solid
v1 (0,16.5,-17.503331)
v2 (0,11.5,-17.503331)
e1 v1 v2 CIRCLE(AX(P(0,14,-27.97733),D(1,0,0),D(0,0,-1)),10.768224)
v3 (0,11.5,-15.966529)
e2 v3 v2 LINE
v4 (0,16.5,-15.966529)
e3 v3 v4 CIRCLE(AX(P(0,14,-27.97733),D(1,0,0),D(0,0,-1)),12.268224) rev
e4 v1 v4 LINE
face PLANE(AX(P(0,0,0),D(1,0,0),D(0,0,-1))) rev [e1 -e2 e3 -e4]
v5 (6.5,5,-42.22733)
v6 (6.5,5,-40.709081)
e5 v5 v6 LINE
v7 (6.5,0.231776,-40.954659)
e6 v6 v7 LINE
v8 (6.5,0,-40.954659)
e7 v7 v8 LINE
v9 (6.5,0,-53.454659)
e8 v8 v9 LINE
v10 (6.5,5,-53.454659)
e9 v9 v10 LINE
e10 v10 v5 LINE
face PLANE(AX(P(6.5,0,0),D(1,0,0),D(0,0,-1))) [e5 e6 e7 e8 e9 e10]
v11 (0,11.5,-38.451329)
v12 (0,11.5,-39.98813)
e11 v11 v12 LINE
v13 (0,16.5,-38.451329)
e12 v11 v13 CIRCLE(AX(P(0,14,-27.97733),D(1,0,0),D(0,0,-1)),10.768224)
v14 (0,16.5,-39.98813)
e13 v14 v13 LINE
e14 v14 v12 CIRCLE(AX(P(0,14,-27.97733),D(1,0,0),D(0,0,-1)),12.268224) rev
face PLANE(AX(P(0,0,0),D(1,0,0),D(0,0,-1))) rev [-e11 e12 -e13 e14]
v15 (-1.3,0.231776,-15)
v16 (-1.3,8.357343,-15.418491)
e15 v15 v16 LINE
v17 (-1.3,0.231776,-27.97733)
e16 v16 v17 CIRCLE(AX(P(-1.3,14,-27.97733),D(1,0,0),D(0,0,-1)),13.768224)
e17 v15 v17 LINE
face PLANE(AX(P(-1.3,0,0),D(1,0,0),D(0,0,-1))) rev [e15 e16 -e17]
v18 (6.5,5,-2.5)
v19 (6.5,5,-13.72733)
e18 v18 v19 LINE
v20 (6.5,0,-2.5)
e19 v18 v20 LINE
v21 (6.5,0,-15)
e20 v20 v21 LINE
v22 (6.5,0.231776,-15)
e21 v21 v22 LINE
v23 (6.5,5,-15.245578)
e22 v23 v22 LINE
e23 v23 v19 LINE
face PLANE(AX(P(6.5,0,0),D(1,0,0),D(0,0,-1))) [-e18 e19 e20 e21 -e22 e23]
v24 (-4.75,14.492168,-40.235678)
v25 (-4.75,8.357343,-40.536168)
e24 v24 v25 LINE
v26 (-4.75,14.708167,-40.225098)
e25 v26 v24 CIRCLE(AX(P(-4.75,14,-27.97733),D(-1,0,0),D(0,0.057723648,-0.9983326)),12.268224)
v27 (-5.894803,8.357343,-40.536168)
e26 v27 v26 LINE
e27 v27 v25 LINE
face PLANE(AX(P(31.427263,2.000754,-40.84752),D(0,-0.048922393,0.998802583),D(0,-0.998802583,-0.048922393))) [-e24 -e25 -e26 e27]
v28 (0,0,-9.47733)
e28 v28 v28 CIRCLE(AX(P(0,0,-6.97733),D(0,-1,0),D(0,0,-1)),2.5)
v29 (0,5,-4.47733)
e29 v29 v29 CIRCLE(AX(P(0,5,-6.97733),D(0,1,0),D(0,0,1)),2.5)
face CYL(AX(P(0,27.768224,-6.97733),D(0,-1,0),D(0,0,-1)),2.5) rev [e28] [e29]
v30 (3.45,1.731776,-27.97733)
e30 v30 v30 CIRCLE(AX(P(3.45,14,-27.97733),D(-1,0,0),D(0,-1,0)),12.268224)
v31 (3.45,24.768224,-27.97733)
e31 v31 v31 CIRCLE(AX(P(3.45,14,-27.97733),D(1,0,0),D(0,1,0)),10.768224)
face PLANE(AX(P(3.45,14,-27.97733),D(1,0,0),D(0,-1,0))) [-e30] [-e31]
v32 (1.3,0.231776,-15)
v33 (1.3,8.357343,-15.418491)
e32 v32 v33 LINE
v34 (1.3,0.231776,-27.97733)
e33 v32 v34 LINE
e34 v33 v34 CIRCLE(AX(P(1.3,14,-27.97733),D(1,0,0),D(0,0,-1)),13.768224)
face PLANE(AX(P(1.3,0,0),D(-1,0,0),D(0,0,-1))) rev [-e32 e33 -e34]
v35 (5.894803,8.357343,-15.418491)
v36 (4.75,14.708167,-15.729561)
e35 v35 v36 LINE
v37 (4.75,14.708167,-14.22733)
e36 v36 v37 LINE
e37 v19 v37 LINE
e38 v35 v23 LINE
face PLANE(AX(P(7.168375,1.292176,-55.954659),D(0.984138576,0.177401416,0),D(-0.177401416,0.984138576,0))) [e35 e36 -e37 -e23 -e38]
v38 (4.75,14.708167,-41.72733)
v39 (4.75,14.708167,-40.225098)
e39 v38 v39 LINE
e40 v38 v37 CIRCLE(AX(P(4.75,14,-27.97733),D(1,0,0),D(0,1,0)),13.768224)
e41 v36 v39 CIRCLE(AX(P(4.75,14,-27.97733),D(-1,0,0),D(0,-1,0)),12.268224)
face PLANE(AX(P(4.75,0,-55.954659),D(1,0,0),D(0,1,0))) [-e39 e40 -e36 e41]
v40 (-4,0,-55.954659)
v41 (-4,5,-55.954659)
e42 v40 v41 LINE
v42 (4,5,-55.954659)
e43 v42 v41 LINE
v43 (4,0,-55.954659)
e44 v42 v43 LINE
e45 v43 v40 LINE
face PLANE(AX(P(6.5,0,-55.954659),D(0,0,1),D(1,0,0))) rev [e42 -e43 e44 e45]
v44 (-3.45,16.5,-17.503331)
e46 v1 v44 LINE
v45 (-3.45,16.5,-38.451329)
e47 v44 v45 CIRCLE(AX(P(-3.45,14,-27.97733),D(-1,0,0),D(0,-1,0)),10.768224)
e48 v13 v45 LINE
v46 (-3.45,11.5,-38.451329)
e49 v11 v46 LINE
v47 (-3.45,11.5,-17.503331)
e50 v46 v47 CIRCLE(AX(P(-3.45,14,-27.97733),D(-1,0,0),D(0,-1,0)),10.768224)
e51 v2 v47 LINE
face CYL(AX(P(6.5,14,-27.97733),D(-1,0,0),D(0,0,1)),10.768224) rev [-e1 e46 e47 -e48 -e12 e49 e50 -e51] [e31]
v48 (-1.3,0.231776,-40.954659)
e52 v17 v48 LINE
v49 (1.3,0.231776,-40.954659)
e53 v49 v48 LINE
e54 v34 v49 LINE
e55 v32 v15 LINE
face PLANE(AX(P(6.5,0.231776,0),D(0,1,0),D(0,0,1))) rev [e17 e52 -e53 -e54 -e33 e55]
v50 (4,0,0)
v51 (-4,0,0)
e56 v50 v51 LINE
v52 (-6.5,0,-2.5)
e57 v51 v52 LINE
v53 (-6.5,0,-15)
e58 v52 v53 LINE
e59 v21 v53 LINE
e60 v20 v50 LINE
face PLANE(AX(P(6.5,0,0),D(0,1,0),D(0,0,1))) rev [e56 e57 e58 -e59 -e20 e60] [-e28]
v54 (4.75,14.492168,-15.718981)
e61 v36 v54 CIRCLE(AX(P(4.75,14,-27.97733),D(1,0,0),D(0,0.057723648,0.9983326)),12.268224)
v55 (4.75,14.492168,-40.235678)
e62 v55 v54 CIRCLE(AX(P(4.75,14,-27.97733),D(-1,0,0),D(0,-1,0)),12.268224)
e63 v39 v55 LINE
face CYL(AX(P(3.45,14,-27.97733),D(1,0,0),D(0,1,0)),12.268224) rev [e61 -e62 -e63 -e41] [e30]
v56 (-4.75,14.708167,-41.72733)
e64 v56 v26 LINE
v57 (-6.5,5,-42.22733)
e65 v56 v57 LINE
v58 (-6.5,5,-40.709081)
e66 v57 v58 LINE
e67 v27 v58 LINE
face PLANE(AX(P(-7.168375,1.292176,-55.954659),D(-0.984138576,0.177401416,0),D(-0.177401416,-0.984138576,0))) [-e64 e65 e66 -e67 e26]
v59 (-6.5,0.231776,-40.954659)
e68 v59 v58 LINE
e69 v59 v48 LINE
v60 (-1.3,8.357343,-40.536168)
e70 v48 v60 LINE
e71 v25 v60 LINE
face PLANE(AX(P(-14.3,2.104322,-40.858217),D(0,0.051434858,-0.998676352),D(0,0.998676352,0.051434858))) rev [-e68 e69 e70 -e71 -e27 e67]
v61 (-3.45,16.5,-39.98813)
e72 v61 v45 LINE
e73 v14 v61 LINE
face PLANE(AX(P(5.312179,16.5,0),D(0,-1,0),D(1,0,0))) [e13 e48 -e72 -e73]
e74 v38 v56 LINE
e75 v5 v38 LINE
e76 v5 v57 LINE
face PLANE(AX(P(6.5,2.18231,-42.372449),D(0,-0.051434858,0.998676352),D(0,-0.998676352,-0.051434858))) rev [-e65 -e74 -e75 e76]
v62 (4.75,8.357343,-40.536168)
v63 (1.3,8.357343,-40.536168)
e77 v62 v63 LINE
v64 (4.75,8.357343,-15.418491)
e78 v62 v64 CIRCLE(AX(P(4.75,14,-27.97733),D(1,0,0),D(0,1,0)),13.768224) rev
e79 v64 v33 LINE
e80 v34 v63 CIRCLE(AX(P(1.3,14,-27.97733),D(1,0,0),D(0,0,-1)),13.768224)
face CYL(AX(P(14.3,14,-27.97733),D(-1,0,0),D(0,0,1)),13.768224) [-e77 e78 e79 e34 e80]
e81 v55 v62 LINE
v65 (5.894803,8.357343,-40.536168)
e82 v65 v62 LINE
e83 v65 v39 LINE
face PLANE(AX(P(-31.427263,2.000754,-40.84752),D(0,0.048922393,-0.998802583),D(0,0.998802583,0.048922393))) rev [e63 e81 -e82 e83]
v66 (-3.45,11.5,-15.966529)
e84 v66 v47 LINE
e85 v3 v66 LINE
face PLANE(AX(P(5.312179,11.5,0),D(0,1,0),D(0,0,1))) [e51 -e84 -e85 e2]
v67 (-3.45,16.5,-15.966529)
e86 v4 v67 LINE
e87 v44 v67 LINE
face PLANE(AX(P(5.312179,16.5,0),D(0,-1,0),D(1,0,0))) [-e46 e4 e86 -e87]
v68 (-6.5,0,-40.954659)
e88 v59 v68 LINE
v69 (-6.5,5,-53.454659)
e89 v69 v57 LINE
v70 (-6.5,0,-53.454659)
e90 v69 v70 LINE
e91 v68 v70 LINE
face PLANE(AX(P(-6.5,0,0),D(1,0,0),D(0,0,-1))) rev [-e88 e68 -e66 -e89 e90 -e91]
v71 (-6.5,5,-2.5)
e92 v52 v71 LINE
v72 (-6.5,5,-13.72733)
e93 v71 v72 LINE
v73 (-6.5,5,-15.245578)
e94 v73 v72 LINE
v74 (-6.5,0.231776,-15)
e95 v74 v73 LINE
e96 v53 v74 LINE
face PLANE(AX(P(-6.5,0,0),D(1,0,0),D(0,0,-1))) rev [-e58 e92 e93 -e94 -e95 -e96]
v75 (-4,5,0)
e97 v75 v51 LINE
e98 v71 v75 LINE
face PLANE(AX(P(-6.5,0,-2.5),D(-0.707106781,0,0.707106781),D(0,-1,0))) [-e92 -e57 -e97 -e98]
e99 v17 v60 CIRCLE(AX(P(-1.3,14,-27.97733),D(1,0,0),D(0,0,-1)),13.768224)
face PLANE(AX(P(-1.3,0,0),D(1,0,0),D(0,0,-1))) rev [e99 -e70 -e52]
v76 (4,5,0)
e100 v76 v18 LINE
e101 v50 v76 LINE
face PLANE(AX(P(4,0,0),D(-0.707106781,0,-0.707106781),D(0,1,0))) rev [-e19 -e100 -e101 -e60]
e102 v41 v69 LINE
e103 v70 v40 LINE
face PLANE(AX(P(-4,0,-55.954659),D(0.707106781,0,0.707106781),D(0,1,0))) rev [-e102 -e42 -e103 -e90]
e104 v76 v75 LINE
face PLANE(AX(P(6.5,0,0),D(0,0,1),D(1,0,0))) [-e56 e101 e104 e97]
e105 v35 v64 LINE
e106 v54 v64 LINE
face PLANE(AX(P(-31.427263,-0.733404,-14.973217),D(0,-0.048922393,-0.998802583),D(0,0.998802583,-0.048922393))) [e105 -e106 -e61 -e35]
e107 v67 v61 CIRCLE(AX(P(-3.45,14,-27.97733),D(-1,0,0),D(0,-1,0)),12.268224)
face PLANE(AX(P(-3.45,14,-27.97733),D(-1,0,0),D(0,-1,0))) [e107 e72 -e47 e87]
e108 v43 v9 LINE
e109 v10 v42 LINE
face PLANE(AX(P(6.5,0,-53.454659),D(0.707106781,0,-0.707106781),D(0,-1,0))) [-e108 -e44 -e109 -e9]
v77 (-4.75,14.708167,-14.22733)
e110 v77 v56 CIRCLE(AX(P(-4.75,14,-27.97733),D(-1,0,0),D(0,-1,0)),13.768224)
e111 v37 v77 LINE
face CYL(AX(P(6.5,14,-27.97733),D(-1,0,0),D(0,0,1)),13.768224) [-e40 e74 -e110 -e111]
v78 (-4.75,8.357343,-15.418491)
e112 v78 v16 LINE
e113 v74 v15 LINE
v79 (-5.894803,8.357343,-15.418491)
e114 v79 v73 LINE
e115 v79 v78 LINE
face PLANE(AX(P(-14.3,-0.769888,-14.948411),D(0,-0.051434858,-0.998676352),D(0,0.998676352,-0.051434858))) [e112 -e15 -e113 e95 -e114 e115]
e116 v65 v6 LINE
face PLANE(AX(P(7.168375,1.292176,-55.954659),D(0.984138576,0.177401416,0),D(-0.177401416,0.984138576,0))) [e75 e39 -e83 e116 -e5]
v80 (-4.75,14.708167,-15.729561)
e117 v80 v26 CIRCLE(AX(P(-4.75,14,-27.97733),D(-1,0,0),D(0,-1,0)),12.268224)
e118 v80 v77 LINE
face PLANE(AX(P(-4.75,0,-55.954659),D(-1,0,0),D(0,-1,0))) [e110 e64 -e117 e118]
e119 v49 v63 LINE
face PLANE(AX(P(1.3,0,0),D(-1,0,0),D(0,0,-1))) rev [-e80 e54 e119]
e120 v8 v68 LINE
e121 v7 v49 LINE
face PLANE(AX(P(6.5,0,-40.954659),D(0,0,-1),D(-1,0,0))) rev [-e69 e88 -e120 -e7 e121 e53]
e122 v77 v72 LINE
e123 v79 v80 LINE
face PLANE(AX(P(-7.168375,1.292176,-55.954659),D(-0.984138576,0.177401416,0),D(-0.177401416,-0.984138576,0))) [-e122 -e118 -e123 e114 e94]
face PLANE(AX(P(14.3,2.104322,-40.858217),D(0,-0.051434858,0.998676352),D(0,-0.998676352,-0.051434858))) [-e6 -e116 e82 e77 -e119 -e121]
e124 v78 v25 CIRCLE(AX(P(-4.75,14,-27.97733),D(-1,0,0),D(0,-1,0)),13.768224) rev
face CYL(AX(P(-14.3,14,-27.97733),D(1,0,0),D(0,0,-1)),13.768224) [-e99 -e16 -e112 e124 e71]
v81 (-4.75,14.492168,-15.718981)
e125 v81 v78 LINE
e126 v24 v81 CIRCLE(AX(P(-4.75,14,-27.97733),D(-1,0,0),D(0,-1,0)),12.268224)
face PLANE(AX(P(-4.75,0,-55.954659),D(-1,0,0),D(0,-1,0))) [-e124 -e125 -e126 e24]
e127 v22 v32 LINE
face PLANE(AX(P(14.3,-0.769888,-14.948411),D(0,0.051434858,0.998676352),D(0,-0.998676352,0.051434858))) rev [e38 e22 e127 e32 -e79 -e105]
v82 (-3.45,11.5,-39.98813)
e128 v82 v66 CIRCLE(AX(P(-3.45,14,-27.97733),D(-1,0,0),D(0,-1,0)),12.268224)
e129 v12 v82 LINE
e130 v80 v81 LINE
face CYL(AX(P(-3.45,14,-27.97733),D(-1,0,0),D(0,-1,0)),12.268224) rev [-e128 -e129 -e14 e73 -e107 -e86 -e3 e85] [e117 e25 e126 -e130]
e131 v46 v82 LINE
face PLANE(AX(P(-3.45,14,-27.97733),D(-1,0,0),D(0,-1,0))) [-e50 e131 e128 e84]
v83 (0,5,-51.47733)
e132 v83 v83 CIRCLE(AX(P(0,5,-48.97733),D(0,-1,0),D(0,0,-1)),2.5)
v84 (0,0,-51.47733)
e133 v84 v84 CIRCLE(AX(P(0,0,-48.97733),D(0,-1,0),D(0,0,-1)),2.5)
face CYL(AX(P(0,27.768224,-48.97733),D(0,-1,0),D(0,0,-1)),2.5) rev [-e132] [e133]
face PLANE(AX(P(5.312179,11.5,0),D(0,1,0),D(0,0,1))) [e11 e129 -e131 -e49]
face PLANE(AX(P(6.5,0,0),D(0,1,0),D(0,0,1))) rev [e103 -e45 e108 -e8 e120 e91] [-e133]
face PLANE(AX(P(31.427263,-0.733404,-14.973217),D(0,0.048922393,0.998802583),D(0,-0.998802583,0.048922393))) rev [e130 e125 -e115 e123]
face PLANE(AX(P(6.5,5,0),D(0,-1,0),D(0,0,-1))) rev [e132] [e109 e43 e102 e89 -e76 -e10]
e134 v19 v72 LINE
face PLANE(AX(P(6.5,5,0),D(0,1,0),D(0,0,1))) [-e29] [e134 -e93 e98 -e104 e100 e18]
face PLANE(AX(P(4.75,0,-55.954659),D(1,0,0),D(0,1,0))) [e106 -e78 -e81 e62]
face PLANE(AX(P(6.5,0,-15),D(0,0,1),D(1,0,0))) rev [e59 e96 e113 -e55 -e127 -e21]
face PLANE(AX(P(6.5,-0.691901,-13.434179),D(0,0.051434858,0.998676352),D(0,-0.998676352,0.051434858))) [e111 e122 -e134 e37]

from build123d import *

# Parameters (mm, degrees)
SKETCH1_R              = 13.768224287
SKETCH1_R_2            = 12.268224287
SKETCH1_R_3            = 10.768224287
BOSS_EXTRUDE1_DEPTH    = 6.5
CUT_EXTRUDE3_DEPTH     = 519.353793234
CUT_EXTRUDE1_START     = -1.3
CUT_EXTRUDE1_DEPTH     = 13
CUT_EXTRUDE8_START     = -1.75
CUT_EXTRUDE8_OUTLINE_R = 10.768224287
CUT_EXTRUDE8_DEPTH     = 1.75
SKETCH6_R              = 12.268224287
CUT_EXTRUDE9_DEPTH     = 1.3
CUT_EXTRUDE12_START    = -1.75
CUT_EXTRUDE12_DEPTH    = 1.75
SKETCH8_R              = 2.5
CUT_EXTRUDE13_DEPTH    = 63.803249571
CHAMFER1_SIZE          = 2.5
CUT_EXTRUDE14_START    = -3.45
CUT_EXTRUDE14_DEPTH    = 3.45


# Read off the part's stored shape, not the designer's step: Cut-Extrude8
with BuildPart() as part:
    # Sketch1 → Boss-Extrude1 (new, symmetric)
    # profile 1 of 6: a face of its own
    with BuildSketch(Plane(origin=(0, 0, 0), x_dir=(0, 0, -1), z_dir=(1, 0, 0))):
        with BuildLine():
            Line((0, 5), (0, 0))
            Line((0, 0), (15, 0))
            Line((15, 0), (15, 0.231775713))
            Line((15, 0.231775713), (15.418491318, 8.357342638))
            ThreePointArc((15.418491318, 8.357342638), (14.445072398, 11.461887277), (14.227329557, 14.708166664))
            Line((14.227329557, 14.708166664), (13.727329557, 5))
            Line((13.727329557, 5), (0, 5))
        make_face()
    # profile 2 of 6: a face of its own
    with BuildSketch(Plane(origin=(0, 0, 0), x_dir=(0, 0, -1), z_dir=(1, 0, 0))):
        with BuildLine():
            Line((15.418491318, 8.357342638), (15, 0.231775713))
            Line((15, 0.231775713), (27.977329557, 0.231775713))
            ThreePointArc((27.977329557, 0.231775713), (20.498204345, 2.440299049), (15.418491318, 8.357342638))
        make_face()
    # profile 3 of 6: a face of its own
    with BuildSketch(Plane(origin=(0, 0, 0), x_dir=(0, 0, -1), z_dir=(1, 0, 0))):
        with BuildLine():
            ThreePointArc((40.536167797, 8.357342638), (35.45645477, 2.440299049), (27.977329557, 0.231775713))
            Line((27.977329557, 0.231775713), (40.954659115, 0.231775713))
            Line((40.954659115, 0.231775713), (40.536167797, 8.357342638))
        make_face()
    # profile 4 of 6: a face of its own
    with BuildSketch(Plane(origin=(0, 0, 0), x_dir=(0, 0, -1), z_dir=(1, 0, 0))):
        with BuildLine():
            Line((42.227329557, 5), (41.727329557, 14.708166664))
            ThreePointArc((41.727329557, 14.708166664), (41.740997019, 14.354200561), (41.745553845, 14))
            ThreePointArc((41.745553845, 14), (41.439812643, 11.114597224), (40.536167797, 8.357342638))
            Line((40.536167797, 8.357342638), (40.954659115, 0.231775713))
            Line((40.954659115, 0.231775713), (40.954659115, 0))
            Line((40.954659115, 0), (55.954659115, 0))
            Line((55.954659115, 0), (55.954659115, 5))
            Line((55.954659115, 5), (42.227329557, 5))
        make_face()
    # profile 5 of 6: a face of its own
    with BuildSketch(Plane(origin=(0, 0, 0), x_dir=(0, 0, -1), z_dir=(1, 0, 0))):
        with Locations((27.977329557, 14)):
            Circle(SKETCH1_R)
        with Locations((27.977329557, 14)):
            Circle(SKETCH1_R_2, mode=Mode.SUBTRACT)
    # profile 6 of 6: a face of its own
    with BuildSketch(Plane(origin=(0, 0, 0), x_dir=(0, 0, -1), z_dir=(1, 0, 0))):
        with Locations((27.977329557, 14)):
            Circle(SKETCH1_R_2)
        with Locations(Location((27.977329557, 14, 0), (0, 0, 180))):
            Circle(SKETCH1_R_3, mode=Mode.SUBTRACT)
    extrude(amount=BOSS_EXTRUDE1_DEPTH, both=True)

    # Sketch3 → Cut-Extrude3 (cut, through all)
    with BuildSketch(Plane(origin=(0, -487.515659686, 0), x_dir=(-1, 0, 0), z_dir=(0, 0, 1))):
        Polygon((-4.75, -502.22382635), (-6.5, -492.515659686), (-6.5, -515.283883974), (-4.75, -515.283883974), align=None)
        Polygon((6.5, -515.283883974), (6.5, -492.515659686), (4.75, -502.22382635), (4.75, -515.283883974), align=None)
    extrude(amount=-CUT_EXTRUDE3_DEPTH, mode=Mode.SUBTRACT)

    # Sketch2 → Cut-Extrude1 (cut)
    with BuildSketch(Plane(origin=(0, 0, 0), x_dir=(0, 0, -1), z_dir=(1, 0, 0)).offset(CUT_EXTRUDE1_START)):
        with BuildLine():
            Line((15, 0.231775713), (27.977329557, 0.231775713))
            ThreePointArc((27.977329557, 0.231775713), (20.498204345, 2.440299049), (15.418491318, 8.357342638))
            Line((15.418491318, 8.357342638), (15, 0.231775713))
        make_face()
        with BuildLine():
            Line((27.977329557, 0.231775713), (40.954659115, 0.231775713))
            Line((40.954659115, 0.231775713), (40.536167797, 8.357342638))
            ThreePointArc((40.536167797, 8.357342638), (35.45645477, 2.440299049), (27.977329557, 0.231775713))
        make_face()
    cut_extrude1 = extrude(amount=-CUT_EXTRUDE1_DEPTH, mode=Mode.SUBTRACT)

    # Cut-Extrude8 outline → Cut-Extrude8 (cut)
    with BuildSketch(Plane.ZY.offset(6.5).offset(CUT_EXTRUDE8_START)):
        with BuildLine():
            Line((-40.225097809, 14.708166664), (-40.536167797, 8.357342638))
            ThreePointArc((-40.536167797, 8.357342638), (-27.977329557, 0.231775713), (-15.418491318, 8.357342638))
            Line((-15.418491318, 8.357342638), (-15.729561306, 14.708166664))
            ThreePointArc((-15.729561306, 14.708166664), (-27.977329557, 26.268224287), (-40.225097809, 14.708166664))
        make_face()
        with Locations((-27.977329557, 14)):
            Circle(CUT_EXTRUDE8_OUTLINE_R, mode=Mode.SUBTRACT)
    extrude(amount=CUT_EXTRUDE8_DEPTH, mode=Mode.SUBTRACT)

    # Sketch6 → Cut-Extrude9 (cut)
    with BuildSketch(Plane.ZY.offset(4.75)):
        with Locations(Location((-27.977329557, 14, 0), (0, 0, 270))):
            Circle(SKETCH6_R)
    cut_extrude9 = extrude(amount=-CUT_EXTRUDE9_DEPTH, mode=Mode.SUBTRACT)

    # Mirror2: Cut-Extrude1, Cut-Extrude9 across plane
    add(cut_extrude1.mirror(Plane(origin=(0, 0, 0), x_dir=(0, 0, 1), z_dir=(1, 0, 0))), mode=Mode.SUBTRACT)
    add(cut_extrude9.mirror(Plane(origin=(0, 0, 0), x_dir=(0, 0, 1), z_dir=(1, 0, 0))), mode=Mode.SUBTRACT)

    # Sketch7 → Cut-Extrude12 (cut)
    with BuildSketch(Plane(origin=(6.5, 0, 0), x_dir=(0, 0, -1), z_dir=(1, 0, 0)).offset(CUT_EXTRUDE12_START)):
        with BuildLine():
            ThreePointArc((38.396734532, 5), (39.588438578, 6.600936051), (40.536167797, 8.357342638))
            Line((40.536167797, 8.357342638), (40.225097809, 14.708166664))
            ThreePointArc((40.225097809, 14.708166664), (27.977329557, 26.268224287), (15.729561306, 14.708166664))
            Line((15.729561306, 14.708166664), (15.418491318, 8.357342638))
            ThreePointArc((15.418491318, 8.357342638), (16.366220536, 6.600936051), (17.557924583, 5))
            Line((17.557924583, 5), (22.065083427, 5))
            ThreePointArc((22.065083427, 5), (27.977329557, 3.231775713), (33.889575687, 5))
            Line((33.889575687, 5), (38.396734532, 5))
        make_face()
        with BuildLine():
            Line((22.065083427, 5), (17.557924583, 5))
            ThreePointArc((17.557924583, 5), (27.977329557, 0.231775713), (38.396734532, 5))
            Line((38.396734532, 5), (33.889575687, 5))
            ThreePointArc((33.889575687, 5), (27.977329557, 3.231775713), (22.065083427, 5))
        make_face()
    extrude(amount=CUT_EXTRUDE12_DEPTH, mode=Mode.SUBTRACT)

    # Sketch8 → Cut-Extrude13 (cut, through all)
    with BuildSketch(Plane.XZ):
        with Locations(Location((0, -48.977329557, 0), (0, 0, 270))):
            Circle(SKETCH8_R)
        with Locations(Location((0, -6.977329557, 0), (0, 0, 270))):
            Circle(SKETCH8_R)
    extrude(amount=-CUT_EXTRUDE13_DEPTH, mode=Mode.SUBTRACT)

    # Chamfer1
    chamfer1_edges = [part.edges().sort_by_distance(p)[0] for p in [
        (-6.5, 2.5, 0),
        (6.5, 2.5, -55.954659115),
        (-6.5, 2.5, -55.954659115),
        (6.5, 2.5, 0),
    ]]
    chamfer(chamfer1_edges, length=CHAMFER1_SIZE)

    # Sketch9 → Cut-Extrude14 (cut)
    with BuildSketch(Plane.ZY.offset(3.45).offset(CUT_EXTRUDE14_START)):
        with BuildLine():
            Line((-38.451328521, 16.5), (-39.988129995, 16.5))
            ThreePointArc((-39.988129995, 16.5), (-40.245553845, 14), (-39.988129995, 11.5))
            Line((-39.988129995, 11.5), (-38.451328521, 11.5))
            ThreePointArc((-38.451328521, 11.5), (-38.745553845, 14), (-38.451328521, 16.5))
        make_face()
        with BuildLine():
            ThreePointArc((-15.70910527, 14), (-15.773630921, 15.256609231), (-15.966529119, 16.5))
            Line((-15.966529119, 16.5), (-17.503330593, 16.5))
            ThreePointArc((-17.503330593, 16.5), (-17.282914559, 15.258627083), (-17.20910527, 14))
            ThreePointArc((-17.20910527, 14), (-17.282914559, 12.741372917), (-17.503330593, 11.5))
            Line((-17.503330593, 11.5), (-15.966529119, 11.5))
            ThreePointArc((-15.966529119, 11.5), (-15.773630921, 12.743390769), (-15.70910527, 14))
        make_face()
    extrude(amount=CUT_EXTRUDE14_DEPTH, mode=Mode.SUBTRACT)


solid = part.part
